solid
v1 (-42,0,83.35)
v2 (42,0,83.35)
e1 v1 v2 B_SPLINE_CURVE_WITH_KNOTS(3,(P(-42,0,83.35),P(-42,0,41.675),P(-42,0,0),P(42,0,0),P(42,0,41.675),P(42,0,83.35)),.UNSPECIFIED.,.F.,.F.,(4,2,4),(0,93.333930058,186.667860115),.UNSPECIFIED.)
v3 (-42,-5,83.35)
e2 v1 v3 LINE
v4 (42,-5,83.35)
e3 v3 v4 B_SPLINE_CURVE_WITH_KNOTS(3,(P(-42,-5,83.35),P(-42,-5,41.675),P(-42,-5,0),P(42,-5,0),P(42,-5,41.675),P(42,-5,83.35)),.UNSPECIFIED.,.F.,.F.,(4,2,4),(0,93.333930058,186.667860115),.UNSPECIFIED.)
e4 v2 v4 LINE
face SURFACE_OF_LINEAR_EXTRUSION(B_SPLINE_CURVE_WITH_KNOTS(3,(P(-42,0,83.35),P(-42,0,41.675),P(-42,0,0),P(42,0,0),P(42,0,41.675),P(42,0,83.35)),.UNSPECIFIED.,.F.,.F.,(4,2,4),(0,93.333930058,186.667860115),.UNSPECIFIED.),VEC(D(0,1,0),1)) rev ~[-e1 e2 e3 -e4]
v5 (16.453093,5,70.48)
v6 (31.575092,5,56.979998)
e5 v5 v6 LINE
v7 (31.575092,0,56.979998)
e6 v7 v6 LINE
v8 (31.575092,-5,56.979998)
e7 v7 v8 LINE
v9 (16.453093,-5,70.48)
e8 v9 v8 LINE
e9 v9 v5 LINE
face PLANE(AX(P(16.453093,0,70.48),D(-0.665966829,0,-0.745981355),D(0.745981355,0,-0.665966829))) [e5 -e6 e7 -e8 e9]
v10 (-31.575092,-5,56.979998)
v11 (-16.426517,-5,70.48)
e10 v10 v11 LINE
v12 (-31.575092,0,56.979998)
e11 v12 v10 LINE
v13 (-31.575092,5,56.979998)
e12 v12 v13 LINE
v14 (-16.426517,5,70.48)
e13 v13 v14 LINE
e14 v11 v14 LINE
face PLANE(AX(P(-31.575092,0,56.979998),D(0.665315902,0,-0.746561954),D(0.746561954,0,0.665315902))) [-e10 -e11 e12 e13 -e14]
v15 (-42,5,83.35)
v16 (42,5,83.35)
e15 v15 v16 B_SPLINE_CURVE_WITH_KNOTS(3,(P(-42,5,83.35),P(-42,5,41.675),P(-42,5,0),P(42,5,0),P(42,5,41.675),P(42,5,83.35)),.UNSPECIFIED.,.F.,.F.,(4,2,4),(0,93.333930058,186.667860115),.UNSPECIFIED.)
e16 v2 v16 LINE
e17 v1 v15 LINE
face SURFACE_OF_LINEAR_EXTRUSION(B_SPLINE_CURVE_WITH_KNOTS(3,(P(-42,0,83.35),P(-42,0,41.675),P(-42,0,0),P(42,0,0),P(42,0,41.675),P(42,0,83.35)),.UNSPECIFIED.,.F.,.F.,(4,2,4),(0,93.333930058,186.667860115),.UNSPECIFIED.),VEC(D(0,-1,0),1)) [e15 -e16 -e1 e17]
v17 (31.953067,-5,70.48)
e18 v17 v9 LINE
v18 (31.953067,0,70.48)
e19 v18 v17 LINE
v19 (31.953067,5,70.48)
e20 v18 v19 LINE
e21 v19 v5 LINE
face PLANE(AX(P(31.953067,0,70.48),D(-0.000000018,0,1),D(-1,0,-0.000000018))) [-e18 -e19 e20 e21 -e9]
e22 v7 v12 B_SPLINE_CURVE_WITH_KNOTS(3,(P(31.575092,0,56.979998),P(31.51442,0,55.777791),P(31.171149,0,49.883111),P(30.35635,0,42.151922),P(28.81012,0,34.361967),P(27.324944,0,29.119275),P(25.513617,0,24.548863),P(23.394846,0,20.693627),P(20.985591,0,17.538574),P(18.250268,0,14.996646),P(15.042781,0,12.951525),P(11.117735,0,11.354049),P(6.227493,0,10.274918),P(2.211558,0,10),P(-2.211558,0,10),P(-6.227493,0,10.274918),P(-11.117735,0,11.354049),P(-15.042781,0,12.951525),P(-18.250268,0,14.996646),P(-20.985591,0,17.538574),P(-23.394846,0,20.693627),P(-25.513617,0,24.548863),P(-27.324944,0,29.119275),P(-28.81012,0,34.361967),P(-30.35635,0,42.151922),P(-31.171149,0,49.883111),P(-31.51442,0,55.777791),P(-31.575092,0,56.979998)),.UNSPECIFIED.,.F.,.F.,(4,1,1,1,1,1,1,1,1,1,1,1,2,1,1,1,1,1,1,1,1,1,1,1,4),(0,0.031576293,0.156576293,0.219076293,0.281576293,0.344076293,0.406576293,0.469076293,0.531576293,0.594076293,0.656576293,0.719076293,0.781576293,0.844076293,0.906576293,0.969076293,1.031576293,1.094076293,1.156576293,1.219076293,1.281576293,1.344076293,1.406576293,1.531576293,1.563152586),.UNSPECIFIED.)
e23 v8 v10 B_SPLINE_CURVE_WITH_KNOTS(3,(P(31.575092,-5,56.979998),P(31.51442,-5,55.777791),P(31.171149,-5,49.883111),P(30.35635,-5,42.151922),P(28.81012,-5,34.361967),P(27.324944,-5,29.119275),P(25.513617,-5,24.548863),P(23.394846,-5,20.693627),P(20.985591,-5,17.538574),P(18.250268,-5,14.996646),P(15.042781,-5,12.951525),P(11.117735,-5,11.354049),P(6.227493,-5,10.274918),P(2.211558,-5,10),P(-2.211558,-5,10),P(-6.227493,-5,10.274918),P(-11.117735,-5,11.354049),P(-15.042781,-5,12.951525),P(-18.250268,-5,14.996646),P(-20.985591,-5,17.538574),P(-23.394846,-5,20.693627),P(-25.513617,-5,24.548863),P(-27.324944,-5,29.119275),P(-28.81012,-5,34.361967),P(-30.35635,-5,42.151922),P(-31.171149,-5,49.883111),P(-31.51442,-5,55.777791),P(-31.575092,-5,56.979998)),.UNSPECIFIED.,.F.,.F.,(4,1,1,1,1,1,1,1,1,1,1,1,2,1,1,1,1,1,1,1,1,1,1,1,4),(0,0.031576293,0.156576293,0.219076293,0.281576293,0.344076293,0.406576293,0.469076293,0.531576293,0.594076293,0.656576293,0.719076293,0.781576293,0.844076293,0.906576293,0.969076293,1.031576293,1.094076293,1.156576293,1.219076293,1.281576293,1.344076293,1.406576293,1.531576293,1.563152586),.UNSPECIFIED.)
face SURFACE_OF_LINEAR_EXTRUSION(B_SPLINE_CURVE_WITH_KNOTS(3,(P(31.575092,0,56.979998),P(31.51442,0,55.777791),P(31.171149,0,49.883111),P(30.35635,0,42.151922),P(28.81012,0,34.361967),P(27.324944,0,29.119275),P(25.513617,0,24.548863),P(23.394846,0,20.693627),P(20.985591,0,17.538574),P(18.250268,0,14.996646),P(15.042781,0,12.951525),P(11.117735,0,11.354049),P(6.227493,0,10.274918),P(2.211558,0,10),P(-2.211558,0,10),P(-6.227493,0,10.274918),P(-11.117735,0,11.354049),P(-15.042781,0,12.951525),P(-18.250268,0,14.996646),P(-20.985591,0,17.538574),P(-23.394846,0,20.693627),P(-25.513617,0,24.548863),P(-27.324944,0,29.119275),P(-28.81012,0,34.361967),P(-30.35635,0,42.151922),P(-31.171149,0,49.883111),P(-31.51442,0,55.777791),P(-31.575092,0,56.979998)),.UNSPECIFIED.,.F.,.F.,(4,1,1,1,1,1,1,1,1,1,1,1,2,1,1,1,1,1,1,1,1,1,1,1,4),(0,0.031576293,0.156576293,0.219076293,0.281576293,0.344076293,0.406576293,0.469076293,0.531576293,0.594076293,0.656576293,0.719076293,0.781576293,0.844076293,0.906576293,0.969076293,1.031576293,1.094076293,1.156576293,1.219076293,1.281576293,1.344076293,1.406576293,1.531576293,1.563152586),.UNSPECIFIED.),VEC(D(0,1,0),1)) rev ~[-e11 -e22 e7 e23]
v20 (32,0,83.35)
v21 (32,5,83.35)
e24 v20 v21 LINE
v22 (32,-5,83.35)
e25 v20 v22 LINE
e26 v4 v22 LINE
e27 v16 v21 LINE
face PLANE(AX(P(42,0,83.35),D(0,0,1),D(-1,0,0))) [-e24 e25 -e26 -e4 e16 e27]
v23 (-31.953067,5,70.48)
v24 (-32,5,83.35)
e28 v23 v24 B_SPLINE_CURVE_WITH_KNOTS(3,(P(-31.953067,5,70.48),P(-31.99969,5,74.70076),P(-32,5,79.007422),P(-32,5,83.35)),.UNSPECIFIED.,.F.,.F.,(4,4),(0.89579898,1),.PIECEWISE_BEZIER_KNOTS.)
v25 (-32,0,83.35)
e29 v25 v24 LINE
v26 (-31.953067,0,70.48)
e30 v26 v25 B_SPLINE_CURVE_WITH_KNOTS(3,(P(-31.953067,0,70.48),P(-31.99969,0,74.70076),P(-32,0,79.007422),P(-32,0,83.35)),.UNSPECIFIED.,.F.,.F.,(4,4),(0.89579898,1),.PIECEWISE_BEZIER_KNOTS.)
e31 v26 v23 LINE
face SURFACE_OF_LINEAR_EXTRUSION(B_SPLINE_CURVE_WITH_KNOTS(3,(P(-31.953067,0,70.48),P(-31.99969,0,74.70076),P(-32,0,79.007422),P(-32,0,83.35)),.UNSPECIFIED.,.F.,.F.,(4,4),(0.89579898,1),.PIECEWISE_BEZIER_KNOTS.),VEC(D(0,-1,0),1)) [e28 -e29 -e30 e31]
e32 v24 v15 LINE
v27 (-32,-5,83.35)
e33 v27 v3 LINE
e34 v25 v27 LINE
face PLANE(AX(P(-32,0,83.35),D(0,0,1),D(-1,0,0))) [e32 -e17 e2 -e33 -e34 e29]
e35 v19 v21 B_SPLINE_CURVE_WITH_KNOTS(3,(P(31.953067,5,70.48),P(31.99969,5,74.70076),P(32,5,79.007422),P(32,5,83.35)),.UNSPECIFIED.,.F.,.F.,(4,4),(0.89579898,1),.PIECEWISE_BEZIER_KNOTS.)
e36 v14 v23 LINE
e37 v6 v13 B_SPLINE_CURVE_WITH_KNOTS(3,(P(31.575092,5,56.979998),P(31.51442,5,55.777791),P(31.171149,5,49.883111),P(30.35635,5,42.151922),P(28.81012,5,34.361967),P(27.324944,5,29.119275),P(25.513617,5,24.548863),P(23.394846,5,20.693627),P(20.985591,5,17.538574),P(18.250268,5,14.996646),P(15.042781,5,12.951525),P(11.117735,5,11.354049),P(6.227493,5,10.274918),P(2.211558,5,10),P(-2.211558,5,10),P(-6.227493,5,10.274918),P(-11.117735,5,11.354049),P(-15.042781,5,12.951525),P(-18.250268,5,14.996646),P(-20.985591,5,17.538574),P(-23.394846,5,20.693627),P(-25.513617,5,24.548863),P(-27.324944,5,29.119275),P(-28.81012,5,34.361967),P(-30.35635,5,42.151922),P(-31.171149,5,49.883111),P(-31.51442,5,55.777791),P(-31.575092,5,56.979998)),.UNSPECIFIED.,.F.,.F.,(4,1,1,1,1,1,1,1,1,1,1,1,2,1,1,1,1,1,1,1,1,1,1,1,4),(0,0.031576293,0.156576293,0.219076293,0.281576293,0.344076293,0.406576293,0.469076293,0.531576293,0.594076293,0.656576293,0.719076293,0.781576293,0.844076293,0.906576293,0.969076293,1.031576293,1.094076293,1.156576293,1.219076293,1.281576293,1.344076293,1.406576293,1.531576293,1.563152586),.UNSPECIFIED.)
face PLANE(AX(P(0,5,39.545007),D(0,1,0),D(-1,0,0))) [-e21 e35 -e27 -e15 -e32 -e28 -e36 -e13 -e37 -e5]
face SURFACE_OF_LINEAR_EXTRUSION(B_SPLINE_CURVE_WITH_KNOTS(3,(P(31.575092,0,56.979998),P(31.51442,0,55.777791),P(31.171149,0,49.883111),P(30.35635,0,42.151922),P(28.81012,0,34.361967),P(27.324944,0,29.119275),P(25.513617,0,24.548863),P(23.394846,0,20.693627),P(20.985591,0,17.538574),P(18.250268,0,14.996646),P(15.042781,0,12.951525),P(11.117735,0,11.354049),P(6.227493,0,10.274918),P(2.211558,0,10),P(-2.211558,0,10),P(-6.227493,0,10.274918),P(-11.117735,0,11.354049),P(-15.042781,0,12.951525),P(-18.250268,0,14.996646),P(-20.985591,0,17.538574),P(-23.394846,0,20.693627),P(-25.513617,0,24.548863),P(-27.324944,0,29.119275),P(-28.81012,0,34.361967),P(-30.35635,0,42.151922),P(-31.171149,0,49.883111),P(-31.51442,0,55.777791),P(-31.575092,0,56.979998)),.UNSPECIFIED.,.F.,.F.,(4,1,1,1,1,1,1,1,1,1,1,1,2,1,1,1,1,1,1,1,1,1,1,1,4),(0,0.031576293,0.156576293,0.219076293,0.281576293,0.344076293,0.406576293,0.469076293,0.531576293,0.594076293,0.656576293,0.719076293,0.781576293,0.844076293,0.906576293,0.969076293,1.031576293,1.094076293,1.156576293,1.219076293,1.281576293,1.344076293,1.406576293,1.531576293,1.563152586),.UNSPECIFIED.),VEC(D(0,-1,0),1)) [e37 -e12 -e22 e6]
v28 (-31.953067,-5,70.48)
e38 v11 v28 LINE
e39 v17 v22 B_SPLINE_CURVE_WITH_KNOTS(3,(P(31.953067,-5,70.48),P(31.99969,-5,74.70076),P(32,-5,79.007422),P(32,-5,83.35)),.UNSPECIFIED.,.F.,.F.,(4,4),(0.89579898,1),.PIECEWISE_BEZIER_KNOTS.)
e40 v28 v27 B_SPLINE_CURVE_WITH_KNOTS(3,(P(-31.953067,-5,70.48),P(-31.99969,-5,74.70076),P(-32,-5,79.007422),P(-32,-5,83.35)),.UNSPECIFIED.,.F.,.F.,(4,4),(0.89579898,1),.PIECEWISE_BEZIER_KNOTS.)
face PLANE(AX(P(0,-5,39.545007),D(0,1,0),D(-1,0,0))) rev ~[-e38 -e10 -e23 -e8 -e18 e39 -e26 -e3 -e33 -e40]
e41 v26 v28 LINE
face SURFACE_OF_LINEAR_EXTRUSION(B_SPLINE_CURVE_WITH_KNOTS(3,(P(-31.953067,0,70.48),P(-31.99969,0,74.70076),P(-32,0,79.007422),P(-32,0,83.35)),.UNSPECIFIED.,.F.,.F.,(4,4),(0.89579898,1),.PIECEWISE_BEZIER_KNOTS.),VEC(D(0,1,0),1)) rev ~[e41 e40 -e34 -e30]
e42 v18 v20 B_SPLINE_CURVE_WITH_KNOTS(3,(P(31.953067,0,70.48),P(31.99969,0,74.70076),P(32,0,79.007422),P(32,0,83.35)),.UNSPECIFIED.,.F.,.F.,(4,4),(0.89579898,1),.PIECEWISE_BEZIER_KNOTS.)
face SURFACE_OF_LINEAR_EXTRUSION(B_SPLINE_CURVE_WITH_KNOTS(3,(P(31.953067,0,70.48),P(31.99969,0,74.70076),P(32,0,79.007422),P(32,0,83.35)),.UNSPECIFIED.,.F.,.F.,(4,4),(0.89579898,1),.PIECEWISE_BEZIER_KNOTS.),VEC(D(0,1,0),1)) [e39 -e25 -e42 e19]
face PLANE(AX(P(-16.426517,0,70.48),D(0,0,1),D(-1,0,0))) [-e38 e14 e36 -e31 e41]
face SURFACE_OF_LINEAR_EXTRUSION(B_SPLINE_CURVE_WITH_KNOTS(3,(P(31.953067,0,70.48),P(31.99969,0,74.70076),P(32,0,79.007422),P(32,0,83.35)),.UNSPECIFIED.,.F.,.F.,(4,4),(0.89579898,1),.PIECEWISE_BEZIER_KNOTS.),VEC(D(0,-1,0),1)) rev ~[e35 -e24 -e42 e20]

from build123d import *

# Parameters (mm, degrees)
F1_DEPTH = 5


# Not quite as in the source:
# - ends of sketch curves that miss each other by under 0.0002 mm in the source are joined
# - the dataset's text gives a spline's control points without its knots; the knots are read off the source's solid


with BuildPart() as f1:
    # F0 (on Front) → F1 (new body, symmetric)
    with BuildSketch(Plane.XZ):
        with BuildLine():
            add(Edge.make_bspline(
                [(0, 0), (-42, 0), (-42, 41.675), (-42, 83.35)],
                knots=[0, 0, 0, 0, 93.3339300576, 93.3339300576, 93.3339300576, 93.3339300576], degree=3))
            add(Edge.make_bspline(
                [(0, 0), (42, 0), (42, 41.675), (42, 83.35)],
                knots=[0, 0, 0, 0, 93.3339300576, 93.3339300576, 93.3339300576, 93.3339300576], degree=3))
            Line((42, 83.35), (32, 83.35))
            add(Edge.make_bspline(
                [(31.9530673006, 70.4800003254), (31.9996895611, 74.700760082), (32, 79.0074224925), (32, 83.35)],
                knots=[0.89579898, 0.89579898, 0.89579898, 0.89579898, 1, 1, 1, 1], degree=3))
            add(Edge.make_bspline(
                [(31.5750922391, 56.9799976128), (31.7546010541, 60.5369260512), (31.8825219764, 65.0296170648), (31.9437612931, 69.6375181896), (31.9530673006, 70.4800003254)],
                knots=[0.7815762928, 0.7815762928, 0.7815762928, 0.7815762928, 0.875, 0.89579898, 0.89579898, 0.89579898, 0.89579898], degree=3))
            add(Edge.make_bspline(
                [(0, 10), (2.2115575397, 10), (6.2274929739, 10.2749181924), (11.1177347786, 11.3540494511), (15.0427811386, 12.9515249487), (18.2502684866, 14.996645723), (20.9855911418, 17.5385737315), (23.3948464447, 20.6936265453), (25.5136174291, 24.5488626614), (27.3249436294, 29.1192747786), (28.8101204922, 34.361966709), (30.3563502536, 42.1519217161), (31.1711492212, 49.8831114238), (31.5144200278, 55.777790839), (31.5750922391, 56.9799976128)],
                knots=[0, 0, 0, 0, 0.0625, 0.125, 0.1875, 0.25, 0.3125, 0.375, 0.4375, 0.5, 0.5625, 0.625, 0.75, 0.7815762928, 0.7815762928, 0.7815762928, 0.7815762928], degree=3))
            add(Edge.make_bspline(
                [(0, 10), (-2.2115575397, 10), (-6.2274929739, 10.2749181924), (-11.1177347786, 11.3540494511), (-15.0427811386, 12.9515249487), (-18.2502684866, 14.996645723), (-20.9855911418, 17.5385737315), (-23.3948464447, 20.6936265453), (-25.5136174291, 24.5488626614), (-27.3249436294, 29.1192747786), (-28.8101204922, 34.361966709), (-30.3563502536, 42.1519217161), (-31.1711492212, 49.8831114238), (-31.5144200278, 55.777790839), (-31.5750922391, 56.9799976128)],
                knots=[0, 0, 0, 0, 0.0625, 0.125, 0.1875, 0.25, 0.3125, 0.375, 0.4375, 0.5, 0.5625, 0.625, 0.75, 0.7815762928, 0.7815762928, 0.7815762928, 0.7815762928], degree=3))
            add(Edge.make_bspline(
                [(-31.5750922391, 56.9799976128), (-31.7546010541, 60.5369260512), (-31.8825219764, 65.0296170648), (-31.9437612931, 69.6375181896), (-31.9530673006, 70.4800003254)],
                knots=[0.7815762928, 0.7815762928, 0.7815762928, 0.7815762928, 0.875, 0.89579898, 0.89579898, 0.89579898, 0.89579898], degree=3))
            add(Edge.make_bspline(
                [(-31.9530673006, 70.4800003254), (-31.9996895611, 74.700760082), (-32, 79.0074224925), (-32, 83.35)],
                knots=[0.89579898, 0.89579898, 0.89579898, 0.89579898, 1, 1, 1, 1], degree=3))
            Line((-32, 83.35), (-42, 83.35))
        make_face()
        with BuildLine():
            add(Edge.make_bspline(
                [(31.5750922391, 56.9799976128), (31.7546010541, 60.5369260512), (31.8825219764, 65.0296170648), (31.9437612931, 69.6375181896), (31.9530673006, 70.4800003254)],
                knots=[0.7815762928, 0.7815762928, 0.7815762928, 0.7815762928, 0.875, 0.89579898, 0.89579898, 0.89579898, 0.89579898], degree=3))
            Line((31.9530673006, 70.4800003254), (16.4530926609, 70.4800000453))
            Line((16.4530926609, 70.4800000453), (31.5750922391, 56.9799976128))
        make_face()
        with BuildLine():
            Line((-16.4265166968, 70.4800000453), (-31.9530926609, 70.4800000453))
            add(Edge.make_bspline(
                [(-31.5750922391, 56.9799976128), (-31.7546010541, 60.5369260512), (-31.8825219764, 65.0296170648), (-31.9437612931, 69.6375181896), (-31.9530926609, 70.4800000453)],
                knots=[0.7815762928, 0.7815762928, 0.7815762928, 0.7815762928, 0.875, 0.89579898, 0.89579898, 0.89579898, 0.89579898], degree=3))
            Line((-31.5750922391, 56.9799976128), (-16.4265166968, 70.4800000453))
        make_face()
    extrude(amount=F1_DEPTH, both=True)


solid = f1.part
